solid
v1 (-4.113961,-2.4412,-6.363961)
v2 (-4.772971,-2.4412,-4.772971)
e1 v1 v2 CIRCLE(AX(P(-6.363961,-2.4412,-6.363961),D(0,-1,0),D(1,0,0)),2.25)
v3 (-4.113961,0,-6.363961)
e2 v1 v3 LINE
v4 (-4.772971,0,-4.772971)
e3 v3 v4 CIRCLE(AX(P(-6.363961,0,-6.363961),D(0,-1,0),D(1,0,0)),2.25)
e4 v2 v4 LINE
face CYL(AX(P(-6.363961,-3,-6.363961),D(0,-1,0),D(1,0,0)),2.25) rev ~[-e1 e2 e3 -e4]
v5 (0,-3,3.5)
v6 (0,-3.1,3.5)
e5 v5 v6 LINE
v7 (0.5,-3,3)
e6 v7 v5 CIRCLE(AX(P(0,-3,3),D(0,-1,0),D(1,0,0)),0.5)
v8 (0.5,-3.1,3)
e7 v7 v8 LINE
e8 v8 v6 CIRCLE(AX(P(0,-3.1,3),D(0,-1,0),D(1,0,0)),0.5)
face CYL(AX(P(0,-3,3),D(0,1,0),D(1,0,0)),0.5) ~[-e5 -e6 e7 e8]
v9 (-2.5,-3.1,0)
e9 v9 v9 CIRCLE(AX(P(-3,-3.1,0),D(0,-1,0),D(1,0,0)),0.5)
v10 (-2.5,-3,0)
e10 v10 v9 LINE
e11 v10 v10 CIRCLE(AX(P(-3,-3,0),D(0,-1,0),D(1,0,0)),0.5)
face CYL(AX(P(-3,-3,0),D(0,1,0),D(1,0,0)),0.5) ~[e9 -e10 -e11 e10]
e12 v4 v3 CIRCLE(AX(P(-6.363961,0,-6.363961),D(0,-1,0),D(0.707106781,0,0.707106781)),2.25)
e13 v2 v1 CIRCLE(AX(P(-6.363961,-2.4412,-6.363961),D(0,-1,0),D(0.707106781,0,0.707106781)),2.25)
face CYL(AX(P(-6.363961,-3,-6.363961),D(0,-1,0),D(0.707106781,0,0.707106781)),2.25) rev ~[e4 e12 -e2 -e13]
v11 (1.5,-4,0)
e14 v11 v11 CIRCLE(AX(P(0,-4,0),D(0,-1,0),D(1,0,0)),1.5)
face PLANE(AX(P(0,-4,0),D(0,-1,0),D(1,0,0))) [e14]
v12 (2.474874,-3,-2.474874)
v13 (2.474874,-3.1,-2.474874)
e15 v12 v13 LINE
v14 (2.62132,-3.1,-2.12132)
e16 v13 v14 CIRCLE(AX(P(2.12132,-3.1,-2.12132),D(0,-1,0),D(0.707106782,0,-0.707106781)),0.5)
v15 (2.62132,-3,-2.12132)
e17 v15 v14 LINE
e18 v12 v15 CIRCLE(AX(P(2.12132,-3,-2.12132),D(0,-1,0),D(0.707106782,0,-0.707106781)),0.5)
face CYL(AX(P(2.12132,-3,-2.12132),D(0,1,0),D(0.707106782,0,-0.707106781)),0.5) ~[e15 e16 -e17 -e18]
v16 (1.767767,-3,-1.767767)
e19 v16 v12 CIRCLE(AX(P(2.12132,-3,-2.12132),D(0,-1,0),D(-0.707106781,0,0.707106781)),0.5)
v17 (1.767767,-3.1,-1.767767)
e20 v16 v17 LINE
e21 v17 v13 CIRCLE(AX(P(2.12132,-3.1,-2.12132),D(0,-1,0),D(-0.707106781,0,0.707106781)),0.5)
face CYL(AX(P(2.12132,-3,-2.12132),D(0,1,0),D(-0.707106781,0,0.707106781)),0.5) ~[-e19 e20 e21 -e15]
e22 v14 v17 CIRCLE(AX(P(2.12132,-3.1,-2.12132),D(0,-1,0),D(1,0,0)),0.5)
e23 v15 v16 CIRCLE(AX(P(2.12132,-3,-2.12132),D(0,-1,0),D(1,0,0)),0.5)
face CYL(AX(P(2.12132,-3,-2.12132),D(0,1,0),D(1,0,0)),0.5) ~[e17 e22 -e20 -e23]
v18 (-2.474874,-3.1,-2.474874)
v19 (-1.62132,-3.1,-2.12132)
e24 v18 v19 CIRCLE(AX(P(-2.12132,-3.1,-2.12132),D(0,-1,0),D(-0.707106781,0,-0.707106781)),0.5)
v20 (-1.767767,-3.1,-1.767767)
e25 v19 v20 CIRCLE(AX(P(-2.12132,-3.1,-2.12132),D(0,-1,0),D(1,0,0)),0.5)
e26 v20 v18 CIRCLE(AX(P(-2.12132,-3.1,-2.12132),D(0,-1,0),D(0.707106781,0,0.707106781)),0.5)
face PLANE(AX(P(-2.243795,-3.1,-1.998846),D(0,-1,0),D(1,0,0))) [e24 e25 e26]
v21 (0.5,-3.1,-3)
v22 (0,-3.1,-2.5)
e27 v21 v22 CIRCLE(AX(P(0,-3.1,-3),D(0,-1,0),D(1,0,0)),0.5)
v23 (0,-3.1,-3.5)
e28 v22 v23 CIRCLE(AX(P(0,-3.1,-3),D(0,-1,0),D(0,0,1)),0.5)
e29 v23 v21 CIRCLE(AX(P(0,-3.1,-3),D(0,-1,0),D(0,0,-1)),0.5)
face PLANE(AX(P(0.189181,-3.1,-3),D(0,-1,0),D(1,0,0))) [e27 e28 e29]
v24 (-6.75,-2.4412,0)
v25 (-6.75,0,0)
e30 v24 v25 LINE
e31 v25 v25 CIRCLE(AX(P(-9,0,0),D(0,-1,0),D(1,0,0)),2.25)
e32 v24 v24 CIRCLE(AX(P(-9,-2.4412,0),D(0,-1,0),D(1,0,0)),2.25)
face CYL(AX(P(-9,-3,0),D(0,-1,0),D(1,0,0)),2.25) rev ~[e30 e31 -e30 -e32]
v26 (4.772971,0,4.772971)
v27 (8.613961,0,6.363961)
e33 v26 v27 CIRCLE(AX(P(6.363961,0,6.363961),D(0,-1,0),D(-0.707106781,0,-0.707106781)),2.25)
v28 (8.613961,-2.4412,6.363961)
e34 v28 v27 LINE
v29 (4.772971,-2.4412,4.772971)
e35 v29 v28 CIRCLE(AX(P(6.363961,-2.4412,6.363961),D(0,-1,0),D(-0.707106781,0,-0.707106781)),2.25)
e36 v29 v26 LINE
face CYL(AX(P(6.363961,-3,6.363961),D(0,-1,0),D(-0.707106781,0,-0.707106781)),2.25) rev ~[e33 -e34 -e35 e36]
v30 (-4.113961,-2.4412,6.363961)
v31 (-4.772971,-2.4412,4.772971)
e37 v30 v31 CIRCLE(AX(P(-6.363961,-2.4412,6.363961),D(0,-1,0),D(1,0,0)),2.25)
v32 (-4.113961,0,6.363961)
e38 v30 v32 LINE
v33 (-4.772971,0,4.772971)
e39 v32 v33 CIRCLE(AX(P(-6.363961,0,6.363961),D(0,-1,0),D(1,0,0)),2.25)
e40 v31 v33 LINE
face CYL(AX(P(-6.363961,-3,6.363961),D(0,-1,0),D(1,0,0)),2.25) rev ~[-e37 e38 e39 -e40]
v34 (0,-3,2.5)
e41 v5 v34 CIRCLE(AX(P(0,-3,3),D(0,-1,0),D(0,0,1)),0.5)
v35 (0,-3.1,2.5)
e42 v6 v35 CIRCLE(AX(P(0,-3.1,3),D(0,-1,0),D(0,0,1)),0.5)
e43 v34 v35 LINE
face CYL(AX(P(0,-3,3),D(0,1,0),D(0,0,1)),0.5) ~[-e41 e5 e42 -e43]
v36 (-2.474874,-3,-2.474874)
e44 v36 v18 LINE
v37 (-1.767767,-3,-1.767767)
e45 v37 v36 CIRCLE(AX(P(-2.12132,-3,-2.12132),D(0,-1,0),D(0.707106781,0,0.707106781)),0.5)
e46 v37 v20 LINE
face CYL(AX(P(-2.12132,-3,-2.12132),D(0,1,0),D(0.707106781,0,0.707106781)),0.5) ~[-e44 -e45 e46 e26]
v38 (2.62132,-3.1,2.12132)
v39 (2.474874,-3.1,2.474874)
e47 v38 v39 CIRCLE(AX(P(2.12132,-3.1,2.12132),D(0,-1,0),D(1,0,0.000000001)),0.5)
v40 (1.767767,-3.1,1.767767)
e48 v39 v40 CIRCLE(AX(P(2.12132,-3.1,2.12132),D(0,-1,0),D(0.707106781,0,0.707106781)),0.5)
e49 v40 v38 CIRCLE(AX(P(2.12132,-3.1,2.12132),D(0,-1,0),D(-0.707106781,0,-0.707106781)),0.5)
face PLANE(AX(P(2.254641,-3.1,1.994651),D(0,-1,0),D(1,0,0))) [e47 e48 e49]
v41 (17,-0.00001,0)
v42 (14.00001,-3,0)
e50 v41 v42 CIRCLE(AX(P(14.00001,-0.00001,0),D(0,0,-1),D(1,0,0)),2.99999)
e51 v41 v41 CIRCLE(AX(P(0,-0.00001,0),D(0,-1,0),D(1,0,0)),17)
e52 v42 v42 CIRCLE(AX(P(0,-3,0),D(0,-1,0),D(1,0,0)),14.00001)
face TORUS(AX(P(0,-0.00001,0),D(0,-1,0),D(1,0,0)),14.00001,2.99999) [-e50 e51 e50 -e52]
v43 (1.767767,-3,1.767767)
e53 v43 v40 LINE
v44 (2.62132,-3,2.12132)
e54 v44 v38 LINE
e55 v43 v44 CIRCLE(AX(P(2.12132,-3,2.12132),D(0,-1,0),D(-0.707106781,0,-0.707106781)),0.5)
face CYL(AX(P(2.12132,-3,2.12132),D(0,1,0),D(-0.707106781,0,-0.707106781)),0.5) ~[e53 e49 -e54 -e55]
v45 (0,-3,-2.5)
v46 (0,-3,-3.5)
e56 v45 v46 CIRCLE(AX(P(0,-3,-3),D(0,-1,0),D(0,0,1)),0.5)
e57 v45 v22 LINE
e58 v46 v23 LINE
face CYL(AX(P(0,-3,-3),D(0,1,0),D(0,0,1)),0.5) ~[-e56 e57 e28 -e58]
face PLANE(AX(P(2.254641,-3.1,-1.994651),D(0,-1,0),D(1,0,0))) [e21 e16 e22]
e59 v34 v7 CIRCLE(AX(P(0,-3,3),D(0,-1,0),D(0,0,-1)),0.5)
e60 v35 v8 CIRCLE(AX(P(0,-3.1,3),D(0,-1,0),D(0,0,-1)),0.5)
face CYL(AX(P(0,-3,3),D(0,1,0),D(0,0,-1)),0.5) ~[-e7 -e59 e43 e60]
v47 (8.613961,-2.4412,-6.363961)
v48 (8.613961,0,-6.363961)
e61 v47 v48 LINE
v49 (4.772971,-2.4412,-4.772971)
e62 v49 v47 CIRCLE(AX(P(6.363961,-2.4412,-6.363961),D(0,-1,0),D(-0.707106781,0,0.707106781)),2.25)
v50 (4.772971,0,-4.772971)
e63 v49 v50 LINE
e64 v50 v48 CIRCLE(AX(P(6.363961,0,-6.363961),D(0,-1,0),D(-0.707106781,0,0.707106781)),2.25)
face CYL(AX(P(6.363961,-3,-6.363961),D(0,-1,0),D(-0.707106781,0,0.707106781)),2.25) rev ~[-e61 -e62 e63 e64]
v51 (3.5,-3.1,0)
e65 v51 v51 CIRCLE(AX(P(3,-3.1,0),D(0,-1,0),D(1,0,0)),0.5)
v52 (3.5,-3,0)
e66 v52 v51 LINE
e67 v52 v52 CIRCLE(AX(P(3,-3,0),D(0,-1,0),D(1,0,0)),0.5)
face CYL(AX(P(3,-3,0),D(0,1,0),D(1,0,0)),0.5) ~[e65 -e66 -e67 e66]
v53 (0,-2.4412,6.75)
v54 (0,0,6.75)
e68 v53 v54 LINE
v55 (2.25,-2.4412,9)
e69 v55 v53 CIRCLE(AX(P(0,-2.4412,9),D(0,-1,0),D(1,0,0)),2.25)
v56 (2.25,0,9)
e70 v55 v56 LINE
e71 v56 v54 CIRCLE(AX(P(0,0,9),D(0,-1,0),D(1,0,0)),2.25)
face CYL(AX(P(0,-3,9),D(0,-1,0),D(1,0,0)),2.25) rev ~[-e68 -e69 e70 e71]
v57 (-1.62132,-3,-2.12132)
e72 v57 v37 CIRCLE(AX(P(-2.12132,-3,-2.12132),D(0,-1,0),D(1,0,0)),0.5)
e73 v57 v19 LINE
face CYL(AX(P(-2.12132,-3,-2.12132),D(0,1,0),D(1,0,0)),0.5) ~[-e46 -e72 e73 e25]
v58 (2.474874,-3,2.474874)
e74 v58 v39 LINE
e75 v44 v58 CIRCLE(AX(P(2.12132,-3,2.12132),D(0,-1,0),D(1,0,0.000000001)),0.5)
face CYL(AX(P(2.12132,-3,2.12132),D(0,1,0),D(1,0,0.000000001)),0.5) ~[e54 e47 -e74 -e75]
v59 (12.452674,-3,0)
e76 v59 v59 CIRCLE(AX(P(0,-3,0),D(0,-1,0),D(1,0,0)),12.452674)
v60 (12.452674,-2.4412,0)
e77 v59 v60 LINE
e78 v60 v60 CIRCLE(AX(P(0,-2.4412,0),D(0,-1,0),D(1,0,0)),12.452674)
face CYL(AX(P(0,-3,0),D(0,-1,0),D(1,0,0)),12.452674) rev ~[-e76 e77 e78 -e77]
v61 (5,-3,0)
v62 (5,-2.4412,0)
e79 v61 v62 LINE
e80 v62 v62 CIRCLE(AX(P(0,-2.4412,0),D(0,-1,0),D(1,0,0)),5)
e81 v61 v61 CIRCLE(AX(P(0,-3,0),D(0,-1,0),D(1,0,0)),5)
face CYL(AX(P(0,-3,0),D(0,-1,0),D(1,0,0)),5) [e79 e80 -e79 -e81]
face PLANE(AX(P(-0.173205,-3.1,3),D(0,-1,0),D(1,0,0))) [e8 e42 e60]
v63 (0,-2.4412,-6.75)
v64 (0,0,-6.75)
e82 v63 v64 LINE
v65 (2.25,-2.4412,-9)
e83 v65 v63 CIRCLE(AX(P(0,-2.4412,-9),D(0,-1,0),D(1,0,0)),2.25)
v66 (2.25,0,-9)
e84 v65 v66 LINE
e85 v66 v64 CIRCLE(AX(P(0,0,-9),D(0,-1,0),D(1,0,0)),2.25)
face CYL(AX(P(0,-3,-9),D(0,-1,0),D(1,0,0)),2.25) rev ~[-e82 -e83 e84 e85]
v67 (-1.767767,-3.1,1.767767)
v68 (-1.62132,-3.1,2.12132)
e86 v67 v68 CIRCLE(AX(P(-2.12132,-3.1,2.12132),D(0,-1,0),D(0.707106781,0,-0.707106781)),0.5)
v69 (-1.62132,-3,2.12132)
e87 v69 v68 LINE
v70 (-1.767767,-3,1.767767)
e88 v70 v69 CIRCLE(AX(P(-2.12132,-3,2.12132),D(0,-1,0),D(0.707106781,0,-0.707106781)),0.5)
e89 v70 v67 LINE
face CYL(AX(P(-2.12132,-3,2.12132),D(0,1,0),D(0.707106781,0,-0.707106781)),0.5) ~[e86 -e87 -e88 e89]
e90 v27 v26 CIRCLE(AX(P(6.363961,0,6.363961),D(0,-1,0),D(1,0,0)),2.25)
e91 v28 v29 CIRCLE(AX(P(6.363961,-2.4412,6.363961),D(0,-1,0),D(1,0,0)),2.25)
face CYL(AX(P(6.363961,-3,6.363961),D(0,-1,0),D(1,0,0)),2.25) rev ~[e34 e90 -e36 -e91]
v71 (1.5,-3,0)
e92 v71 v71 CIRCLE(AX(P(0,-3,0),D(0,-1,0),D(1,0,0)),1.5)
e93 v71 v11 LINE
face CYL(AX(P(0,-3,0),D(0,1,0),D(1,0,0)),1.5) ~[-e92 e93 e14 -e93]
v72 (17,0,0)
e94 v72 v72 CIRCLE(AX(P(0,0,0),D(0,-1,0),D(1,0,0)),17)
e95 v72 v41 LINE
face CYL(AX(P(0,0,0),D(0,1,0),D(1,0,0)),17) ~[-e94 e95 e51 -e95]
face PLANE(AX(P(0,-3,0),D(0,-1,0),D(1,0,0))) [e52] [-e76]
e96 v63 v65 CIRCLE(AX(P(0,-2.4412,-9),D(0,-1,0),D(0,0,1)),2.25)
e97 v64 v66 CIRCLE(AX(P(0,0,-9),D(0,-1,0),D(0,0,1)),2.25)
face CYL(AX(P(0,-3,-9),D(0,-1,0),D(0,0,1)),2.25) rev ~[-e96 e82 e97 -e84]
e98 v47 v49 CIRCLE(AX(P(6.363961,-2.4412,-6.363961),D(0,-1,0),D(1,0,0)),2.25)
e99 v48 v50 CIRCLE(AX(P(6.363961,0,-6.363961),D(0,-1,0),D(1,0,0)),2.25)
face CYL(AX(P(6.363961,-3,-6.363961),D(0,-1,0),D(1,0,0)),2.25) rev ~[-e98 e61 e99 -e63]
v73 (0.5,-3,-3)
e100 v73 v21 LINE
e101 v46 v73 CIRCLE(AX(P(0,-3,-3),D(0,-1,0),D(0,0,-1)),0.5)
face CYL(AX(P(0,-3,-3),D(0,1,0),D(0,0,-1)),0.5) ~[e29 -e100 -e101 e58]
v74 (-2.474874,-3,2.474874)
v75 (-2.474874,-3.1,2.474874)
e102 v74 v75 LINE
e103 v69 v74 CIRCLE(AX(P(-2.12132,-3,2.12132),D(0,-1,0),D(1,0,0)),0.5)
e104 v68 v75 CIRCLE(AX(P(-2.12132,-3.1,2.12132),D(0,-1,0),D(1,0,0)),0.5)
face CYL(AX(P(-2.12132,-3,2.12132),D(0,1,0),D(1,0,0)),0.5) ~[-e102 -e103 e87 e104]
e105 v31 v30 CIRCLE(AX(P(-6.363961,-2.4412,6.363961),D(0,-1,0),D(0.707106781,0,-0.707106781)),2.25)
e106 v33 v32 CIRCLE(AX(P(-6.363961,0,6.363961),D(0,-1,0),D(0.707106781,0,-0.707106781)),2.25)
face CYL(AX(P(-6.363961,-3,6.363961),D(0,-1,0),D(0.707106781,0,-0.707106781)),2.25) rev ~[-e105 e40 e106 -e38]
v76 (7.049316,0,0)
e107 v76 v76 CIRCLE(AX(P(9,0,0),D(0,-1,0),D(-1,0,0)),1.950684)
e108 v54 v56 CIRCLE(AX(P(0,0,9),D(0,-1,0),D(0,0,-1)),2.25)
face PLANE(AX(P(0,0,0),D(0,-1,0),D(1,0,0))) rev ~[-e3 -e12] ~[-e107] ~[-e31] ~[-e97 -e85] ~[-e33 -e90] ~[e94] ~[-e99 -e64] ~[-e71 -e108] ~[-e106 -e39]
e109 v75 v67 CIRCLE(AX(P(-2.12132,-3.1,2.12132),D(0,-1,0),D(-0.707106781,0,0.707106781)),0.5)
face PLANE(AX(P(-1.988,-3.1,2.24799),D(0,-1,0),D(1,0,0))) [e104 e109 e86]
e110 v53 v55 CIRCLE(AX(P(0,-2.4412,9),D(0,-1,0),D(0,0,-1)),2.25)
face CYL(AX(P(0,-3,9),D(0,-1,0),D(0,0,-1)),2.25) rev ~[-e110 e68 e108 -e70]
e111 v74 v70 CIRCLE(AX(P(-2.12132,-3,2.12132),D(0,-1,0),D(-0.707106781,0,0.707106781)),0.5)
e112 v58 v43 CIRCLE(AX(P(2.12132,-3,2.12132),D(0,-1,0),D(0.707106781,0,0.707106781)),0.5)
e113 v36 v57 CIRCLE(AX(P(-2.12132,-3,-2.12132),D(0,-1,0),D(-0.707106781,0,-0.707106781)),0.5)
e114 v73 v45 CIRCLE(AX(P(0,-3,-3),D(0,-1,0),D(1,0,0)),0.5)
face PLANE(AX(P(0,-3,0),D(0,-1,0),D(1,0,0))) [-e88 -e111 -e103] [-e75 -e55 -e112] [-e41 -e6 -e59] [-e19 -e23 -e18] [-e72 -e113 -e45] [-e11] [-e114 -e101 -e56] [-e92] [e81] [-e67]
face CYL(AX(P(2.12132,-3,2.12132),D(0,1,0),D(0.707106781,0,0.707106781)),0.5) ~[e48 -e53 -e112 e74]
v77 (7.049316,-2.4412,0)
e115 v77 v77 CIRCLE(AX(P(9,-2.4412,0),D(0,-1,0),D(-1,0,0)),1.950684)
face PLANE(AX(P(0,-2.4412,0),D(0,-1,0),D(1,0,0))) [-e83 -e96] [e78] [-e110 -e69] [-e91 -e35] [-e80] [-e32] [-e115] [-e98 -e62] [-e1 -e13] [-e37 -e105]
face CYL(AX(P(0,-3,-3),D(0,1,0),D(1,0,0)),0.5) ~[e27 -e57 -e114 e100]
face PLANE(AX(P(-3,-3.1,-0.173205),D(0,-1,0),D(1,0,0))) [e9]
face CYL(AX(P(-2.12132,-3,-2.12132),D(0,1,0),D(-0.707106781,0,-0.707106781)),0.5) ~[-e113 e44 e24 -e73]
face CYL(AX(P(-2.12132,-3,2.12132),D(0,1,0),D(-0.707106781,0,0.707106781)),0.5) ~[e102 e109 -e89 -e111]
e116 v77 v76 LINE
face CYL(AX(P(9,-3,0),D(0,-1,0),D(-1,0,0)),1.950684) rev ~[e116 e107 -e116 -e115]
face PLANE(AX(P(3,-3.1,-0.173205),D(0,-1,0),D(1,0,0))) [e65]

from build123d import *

# Parameters (mm, degrees)
F0_R      = 17
F1_DEPTH  = 3
F3_R      = 2.99999
F5_R      = 12.4526743877
F6_DEPTH  = 0.5588
F7_R      = 5
F8_DEPTH  = 1.143
F10_R     = 2.25
F11_DEPTH = 25.4
F13_DEPTH = 0.1
F14_R     = 1.5
F15_DEPTH = 1


# Not quite as in the source:
# - a fillet or chamfer is up to 0.001 mm smaller than in the source, because OpenCascade refuses the exact size


with BuildPart() as f1:
    # F0 (on Front) → F1 (new body)
    with BuildSketch(Plane.XZ):
        Circle(F0_R)
    extrude(amount=F1_DEPTH)

    # F3 (radius 3 in the source; OpenCascade refuses exactly that, so slightly less here)
    f3_edges = [f1.edges().sort_by_distance(p)[0] for p in [
        (-17, -3, 0),
    ]]
    fillet(f3_edges, radius=F3_R)

    # F5 (on face) → F6 (cut)
    with BuildSketch(Plane.XZ.offset(3)):
        Circle(F5_R)
    extrude(amount=-F6_DEPTH, mode=Mode.SUBTRACT)

    # F7 (on face) → F8 (join)
    with BuildSketch(Plane.XZ.offset(3)):
        Circle(F7_R)
    extrude(amount=-F8_DEPTH)

    # F10 (on face) → F11 (cut)
    with BuildSketch(Plane.XZ.offset(3)):
        with BuildLine():
            ThreePointArc((8.6139610307, -6.3639610307), (7.2249987535, -4.2852320825), (4.772970773, -4.772970773))
            ThreePointArc((4.772970773, -4.772970773), (5.5029233079, -8.4426899788), (8.6139610307, -6.3639610307))
        make_face()
        with BuildLine():
            ThreePointArc((2.25, -9), (1.5909902577, -7.4090097423), (0, -6.75))
            ThreePointArc((0, -6.75), (-1.5909902577, -10.5909902577), (2.25, -9))
        make_face()
        with BuildLine():
            ThreePointArc((-4.1139610307, -6.3639610307), (-4.2852320825, -5.5029233079), (-4.772970773, -4.772970773))
            ThreePointArc((-4.772970773, -4.772970773), (-8.4426899788, -7.2249987535), (-4.1139610307, -6.3639610307))
        make_face()
        with BuildLine():
            ThreePointArc((10.9506839843, 0), (9, 1.9506839843), (7.0493160157, 0))
            ThreePointArc((7.0493160157, 0), (9, -1.9506839843), (10.9506839843, 0))
        make_face()
        with Locations((-9, 0)):
            Circle(F10_R)
        with BuildLine():
            ThreePointArc((-4.1139610307, 6.3639610307), (-8.4426899788, 7.2249987535), (-4.772970773, 4.772970773))
            ThreePointArc((-4.772970773, 4.772970773), (-4.2852320825, 5.5029233079), (-4.1139610307, 6.3639610307))
        make_face()
        with BuildLine():
            ThreePointArc((2.25, 9), (-1.5909902577, 10.5909902577), (0, 6.75))
            ThreePointArc((0, 6.75), (1.5909902577, 7.4090097423), (2.25, 9))
        make_face()
        with BuildLine():
            ThreePointArc((8.6139610307, 6.3639610307), (5.5029233079, 8.4426899788), (4.772970773, 4.772970773))
            ThreePointArc((4.772970773, 4.772970773), (7.2249987535, 4.2852320825), (8.6139610307, 6.3639610307))
        make_face()
    extrude(amount=-F11_DEPTH, mode=Mode.SUBTRACT)

    # F12 (on face) → F13 (join)
    with BuildSketch(Plane.XZ.offset(3)):
        with BuildLine():
            Line((-2.1213203436, 2.1213203436), (-1.767766953, 1.767766953))
            ThreePointArc((-1.767766953, 1.767766953), (-1.6593805773, 1.9299786274), (-1.6213203436, 2.1213203436))
            ThreePointArc((-1.6213203436, 2.1213203436), (-1.9299786274, 2.5832601098), (-2.4748737342, 2.4748737342))
            Line((-2.4748737342, 2.4748737342), (-2.1213203436, 2.1213203436))
        make_face()
        with BuildLine():
            ThreePointArc((-2.4748737342, 2.4748737342), (-2.4748737342, 1.767766953), (-1.767766953, 1.767766953))
            Line((-1.767766953, 1.767766953), (-2.1213203436, 2.1213203436))
            Line((-2.1213203436, 2.1213203436), (-2.4748737342, 2.4748737342))
        make_face()
        with BuildLine():
            Line((0, 3), (0, 3.5))
            ThreePointArc((0, 3.5), (-0.5, 3), (0, 2.5))
            Line((0, 2.5), (0, 3))
        make_face()
        with BuildLine():
            ThreePointArc((0.5, 3), (0.3535533906, 3.3535533906), (0, 3.5))
            Line((0, 3.5), (0, 3))
            Line((0, 3), (0, 2.5))
            ThreePointArc((0, 2.5), (0.3535533906, 2.6464466094), (0.5, 3))
        make_face()
        with BuildLine():
            ThreePointArc((2.6213203436, -2.1213203436), (2.3126620597, -1.6593805773), (1.767766953, -1.767766953))
            Line((1.767766953, -1.767766953), (2.1213203436, -2.1213203436))
            Line((2.1213203436, -2.1213203436), (2.4748737342, -2.4748737342))
            ThreePointArc((2.4748737342, -2.4748737342), (2.5832601098, -2.3126620597), (2.6213203436, -2.1213203436))
        make_face()
        with BuildLine():
            Line((2.1213203436, -2.1213203436), (1.767766953, -1.767766953))
            ThreePointArc((1.767766953, -1.767766953), (1.767766953, -2.4748737342), (2.4748737342, -2.4748737342))
            Line((2.4748737342, -2.4748737342), (2.1213203436, -2.1213203436))
        make_face()
        with BuildLine():
            ThreePointArc((-3.5, 0), (-3, -0.5), (-2.5, 0))
            Line((-2.5, 0), (-3, 0))
            Line((-3, 0), (-3.5, 0))
        make_face()
        with BuildLine():
            Line((-3, 0), (-2.5, 0))
            ThreePointArc((-2.5, 0), (-3, 0.5), (-3.5, 0))
            Line((-3.5, 0), (-3, 0))
        make_face()
        with BuildLine():
            Line((-2.1213203436, -2.1213203436), (-1.767766953, -1.767766953))
            ThreePointArc((-1.767766953, -1.767766953), (-2.4748737342, -1.767766953), (-2.4748737342, -2.4748737342))
            Line((-2.4748737342, -2.4748737342), (-2.1213203436, -2.1213203436))
        make_face()
        with BuildLine():
            ThreePointArc((-1.6213203436, -2.1213203436), (-1.6593805773, -1.9299786274), (-1.767766953, -1.767766953))
            Line((-1.767766953, -1.767766953), (-2.1213203436, -2.1213203436))
            Line((-2.1213203436, -2.1213203436), (-2.4748737342, -2.4748737342))
            ThreePointArc((-2.4748737342, -2.4748737342), (-1.9299786274, -2.5832601098), (-1.6213203436, -2.1213203436))
        make_face()
        with BuildLine():
            ThreePointArc((0.5, -3), (0.3535533906, -2.6464466094), (0, -2.5))
            Line((0, -2.5), (0, -3))
            Line((0, -3), (0, -3.5))
            ThreePointArc((0, -3.5), (0.3535533906, -3.3535533906), (0.5, -3))
        make_face()
        with BuildLine():
            Line((0, -3), (0, -2.5))
            ThreePointArc((0, -2.5), (-0.5, -3), (0, -3.5))
            Line((0, -3.5), (0, -3))
        make_face()
        with BuildLine():
            Line((3, 0), (2.5, 0))
            ThreePointArc((2.5, 0), (3, -0.5), (3.5, 0))
            Line((3.5, 0), (3, 0))
        make_face()
        with BuildLine():
            ThreePointArc((3.5, 0), (3, 0.5), (2.5, 0))
            Line((2.5, 0), (3, 0))
            Line((3, 0), (3.5, 0))
        make_face()
        with BuildLine():
            Line((2.1213203436, 2.1213203436), (1.767766953, 1.767766953))
            ThreePointArc((1.767766953, 1.767766953), (2.3126620597, 1.6593805773), (2.6213203436, 2.1213203436))
            ThreePointArc((2.6213203436, 2.1213203436), (2.5832601098, 2.3126620597), (2.4748737342, 2.4748737342))
            Line((2.4748737342, 2.4748737342), (2.1213203436, 2.1213203436))
        make_face()
        with BuildLine():
            ThreePointArc((2.4748737342, 2.4748737342), (1.767766953, 2.4748737342), (1.767766953, 1.767766953))
            Line((1.767766953, 1.767766953), (2.1213203436, 2.1213203436))
            Line((2.1213203436, 2.1213203436), (2.4748737342, 2.4748737342))
        make_face()
    extrude(amount=F13_DEPTH)

    # F14 (on face) → F15 (join)
    with BuildSketch(Plane.XZ.offset(3)):
        Circle(F14_R)
    extrude(amount=F15_DEPTH)


solid = f1.part
